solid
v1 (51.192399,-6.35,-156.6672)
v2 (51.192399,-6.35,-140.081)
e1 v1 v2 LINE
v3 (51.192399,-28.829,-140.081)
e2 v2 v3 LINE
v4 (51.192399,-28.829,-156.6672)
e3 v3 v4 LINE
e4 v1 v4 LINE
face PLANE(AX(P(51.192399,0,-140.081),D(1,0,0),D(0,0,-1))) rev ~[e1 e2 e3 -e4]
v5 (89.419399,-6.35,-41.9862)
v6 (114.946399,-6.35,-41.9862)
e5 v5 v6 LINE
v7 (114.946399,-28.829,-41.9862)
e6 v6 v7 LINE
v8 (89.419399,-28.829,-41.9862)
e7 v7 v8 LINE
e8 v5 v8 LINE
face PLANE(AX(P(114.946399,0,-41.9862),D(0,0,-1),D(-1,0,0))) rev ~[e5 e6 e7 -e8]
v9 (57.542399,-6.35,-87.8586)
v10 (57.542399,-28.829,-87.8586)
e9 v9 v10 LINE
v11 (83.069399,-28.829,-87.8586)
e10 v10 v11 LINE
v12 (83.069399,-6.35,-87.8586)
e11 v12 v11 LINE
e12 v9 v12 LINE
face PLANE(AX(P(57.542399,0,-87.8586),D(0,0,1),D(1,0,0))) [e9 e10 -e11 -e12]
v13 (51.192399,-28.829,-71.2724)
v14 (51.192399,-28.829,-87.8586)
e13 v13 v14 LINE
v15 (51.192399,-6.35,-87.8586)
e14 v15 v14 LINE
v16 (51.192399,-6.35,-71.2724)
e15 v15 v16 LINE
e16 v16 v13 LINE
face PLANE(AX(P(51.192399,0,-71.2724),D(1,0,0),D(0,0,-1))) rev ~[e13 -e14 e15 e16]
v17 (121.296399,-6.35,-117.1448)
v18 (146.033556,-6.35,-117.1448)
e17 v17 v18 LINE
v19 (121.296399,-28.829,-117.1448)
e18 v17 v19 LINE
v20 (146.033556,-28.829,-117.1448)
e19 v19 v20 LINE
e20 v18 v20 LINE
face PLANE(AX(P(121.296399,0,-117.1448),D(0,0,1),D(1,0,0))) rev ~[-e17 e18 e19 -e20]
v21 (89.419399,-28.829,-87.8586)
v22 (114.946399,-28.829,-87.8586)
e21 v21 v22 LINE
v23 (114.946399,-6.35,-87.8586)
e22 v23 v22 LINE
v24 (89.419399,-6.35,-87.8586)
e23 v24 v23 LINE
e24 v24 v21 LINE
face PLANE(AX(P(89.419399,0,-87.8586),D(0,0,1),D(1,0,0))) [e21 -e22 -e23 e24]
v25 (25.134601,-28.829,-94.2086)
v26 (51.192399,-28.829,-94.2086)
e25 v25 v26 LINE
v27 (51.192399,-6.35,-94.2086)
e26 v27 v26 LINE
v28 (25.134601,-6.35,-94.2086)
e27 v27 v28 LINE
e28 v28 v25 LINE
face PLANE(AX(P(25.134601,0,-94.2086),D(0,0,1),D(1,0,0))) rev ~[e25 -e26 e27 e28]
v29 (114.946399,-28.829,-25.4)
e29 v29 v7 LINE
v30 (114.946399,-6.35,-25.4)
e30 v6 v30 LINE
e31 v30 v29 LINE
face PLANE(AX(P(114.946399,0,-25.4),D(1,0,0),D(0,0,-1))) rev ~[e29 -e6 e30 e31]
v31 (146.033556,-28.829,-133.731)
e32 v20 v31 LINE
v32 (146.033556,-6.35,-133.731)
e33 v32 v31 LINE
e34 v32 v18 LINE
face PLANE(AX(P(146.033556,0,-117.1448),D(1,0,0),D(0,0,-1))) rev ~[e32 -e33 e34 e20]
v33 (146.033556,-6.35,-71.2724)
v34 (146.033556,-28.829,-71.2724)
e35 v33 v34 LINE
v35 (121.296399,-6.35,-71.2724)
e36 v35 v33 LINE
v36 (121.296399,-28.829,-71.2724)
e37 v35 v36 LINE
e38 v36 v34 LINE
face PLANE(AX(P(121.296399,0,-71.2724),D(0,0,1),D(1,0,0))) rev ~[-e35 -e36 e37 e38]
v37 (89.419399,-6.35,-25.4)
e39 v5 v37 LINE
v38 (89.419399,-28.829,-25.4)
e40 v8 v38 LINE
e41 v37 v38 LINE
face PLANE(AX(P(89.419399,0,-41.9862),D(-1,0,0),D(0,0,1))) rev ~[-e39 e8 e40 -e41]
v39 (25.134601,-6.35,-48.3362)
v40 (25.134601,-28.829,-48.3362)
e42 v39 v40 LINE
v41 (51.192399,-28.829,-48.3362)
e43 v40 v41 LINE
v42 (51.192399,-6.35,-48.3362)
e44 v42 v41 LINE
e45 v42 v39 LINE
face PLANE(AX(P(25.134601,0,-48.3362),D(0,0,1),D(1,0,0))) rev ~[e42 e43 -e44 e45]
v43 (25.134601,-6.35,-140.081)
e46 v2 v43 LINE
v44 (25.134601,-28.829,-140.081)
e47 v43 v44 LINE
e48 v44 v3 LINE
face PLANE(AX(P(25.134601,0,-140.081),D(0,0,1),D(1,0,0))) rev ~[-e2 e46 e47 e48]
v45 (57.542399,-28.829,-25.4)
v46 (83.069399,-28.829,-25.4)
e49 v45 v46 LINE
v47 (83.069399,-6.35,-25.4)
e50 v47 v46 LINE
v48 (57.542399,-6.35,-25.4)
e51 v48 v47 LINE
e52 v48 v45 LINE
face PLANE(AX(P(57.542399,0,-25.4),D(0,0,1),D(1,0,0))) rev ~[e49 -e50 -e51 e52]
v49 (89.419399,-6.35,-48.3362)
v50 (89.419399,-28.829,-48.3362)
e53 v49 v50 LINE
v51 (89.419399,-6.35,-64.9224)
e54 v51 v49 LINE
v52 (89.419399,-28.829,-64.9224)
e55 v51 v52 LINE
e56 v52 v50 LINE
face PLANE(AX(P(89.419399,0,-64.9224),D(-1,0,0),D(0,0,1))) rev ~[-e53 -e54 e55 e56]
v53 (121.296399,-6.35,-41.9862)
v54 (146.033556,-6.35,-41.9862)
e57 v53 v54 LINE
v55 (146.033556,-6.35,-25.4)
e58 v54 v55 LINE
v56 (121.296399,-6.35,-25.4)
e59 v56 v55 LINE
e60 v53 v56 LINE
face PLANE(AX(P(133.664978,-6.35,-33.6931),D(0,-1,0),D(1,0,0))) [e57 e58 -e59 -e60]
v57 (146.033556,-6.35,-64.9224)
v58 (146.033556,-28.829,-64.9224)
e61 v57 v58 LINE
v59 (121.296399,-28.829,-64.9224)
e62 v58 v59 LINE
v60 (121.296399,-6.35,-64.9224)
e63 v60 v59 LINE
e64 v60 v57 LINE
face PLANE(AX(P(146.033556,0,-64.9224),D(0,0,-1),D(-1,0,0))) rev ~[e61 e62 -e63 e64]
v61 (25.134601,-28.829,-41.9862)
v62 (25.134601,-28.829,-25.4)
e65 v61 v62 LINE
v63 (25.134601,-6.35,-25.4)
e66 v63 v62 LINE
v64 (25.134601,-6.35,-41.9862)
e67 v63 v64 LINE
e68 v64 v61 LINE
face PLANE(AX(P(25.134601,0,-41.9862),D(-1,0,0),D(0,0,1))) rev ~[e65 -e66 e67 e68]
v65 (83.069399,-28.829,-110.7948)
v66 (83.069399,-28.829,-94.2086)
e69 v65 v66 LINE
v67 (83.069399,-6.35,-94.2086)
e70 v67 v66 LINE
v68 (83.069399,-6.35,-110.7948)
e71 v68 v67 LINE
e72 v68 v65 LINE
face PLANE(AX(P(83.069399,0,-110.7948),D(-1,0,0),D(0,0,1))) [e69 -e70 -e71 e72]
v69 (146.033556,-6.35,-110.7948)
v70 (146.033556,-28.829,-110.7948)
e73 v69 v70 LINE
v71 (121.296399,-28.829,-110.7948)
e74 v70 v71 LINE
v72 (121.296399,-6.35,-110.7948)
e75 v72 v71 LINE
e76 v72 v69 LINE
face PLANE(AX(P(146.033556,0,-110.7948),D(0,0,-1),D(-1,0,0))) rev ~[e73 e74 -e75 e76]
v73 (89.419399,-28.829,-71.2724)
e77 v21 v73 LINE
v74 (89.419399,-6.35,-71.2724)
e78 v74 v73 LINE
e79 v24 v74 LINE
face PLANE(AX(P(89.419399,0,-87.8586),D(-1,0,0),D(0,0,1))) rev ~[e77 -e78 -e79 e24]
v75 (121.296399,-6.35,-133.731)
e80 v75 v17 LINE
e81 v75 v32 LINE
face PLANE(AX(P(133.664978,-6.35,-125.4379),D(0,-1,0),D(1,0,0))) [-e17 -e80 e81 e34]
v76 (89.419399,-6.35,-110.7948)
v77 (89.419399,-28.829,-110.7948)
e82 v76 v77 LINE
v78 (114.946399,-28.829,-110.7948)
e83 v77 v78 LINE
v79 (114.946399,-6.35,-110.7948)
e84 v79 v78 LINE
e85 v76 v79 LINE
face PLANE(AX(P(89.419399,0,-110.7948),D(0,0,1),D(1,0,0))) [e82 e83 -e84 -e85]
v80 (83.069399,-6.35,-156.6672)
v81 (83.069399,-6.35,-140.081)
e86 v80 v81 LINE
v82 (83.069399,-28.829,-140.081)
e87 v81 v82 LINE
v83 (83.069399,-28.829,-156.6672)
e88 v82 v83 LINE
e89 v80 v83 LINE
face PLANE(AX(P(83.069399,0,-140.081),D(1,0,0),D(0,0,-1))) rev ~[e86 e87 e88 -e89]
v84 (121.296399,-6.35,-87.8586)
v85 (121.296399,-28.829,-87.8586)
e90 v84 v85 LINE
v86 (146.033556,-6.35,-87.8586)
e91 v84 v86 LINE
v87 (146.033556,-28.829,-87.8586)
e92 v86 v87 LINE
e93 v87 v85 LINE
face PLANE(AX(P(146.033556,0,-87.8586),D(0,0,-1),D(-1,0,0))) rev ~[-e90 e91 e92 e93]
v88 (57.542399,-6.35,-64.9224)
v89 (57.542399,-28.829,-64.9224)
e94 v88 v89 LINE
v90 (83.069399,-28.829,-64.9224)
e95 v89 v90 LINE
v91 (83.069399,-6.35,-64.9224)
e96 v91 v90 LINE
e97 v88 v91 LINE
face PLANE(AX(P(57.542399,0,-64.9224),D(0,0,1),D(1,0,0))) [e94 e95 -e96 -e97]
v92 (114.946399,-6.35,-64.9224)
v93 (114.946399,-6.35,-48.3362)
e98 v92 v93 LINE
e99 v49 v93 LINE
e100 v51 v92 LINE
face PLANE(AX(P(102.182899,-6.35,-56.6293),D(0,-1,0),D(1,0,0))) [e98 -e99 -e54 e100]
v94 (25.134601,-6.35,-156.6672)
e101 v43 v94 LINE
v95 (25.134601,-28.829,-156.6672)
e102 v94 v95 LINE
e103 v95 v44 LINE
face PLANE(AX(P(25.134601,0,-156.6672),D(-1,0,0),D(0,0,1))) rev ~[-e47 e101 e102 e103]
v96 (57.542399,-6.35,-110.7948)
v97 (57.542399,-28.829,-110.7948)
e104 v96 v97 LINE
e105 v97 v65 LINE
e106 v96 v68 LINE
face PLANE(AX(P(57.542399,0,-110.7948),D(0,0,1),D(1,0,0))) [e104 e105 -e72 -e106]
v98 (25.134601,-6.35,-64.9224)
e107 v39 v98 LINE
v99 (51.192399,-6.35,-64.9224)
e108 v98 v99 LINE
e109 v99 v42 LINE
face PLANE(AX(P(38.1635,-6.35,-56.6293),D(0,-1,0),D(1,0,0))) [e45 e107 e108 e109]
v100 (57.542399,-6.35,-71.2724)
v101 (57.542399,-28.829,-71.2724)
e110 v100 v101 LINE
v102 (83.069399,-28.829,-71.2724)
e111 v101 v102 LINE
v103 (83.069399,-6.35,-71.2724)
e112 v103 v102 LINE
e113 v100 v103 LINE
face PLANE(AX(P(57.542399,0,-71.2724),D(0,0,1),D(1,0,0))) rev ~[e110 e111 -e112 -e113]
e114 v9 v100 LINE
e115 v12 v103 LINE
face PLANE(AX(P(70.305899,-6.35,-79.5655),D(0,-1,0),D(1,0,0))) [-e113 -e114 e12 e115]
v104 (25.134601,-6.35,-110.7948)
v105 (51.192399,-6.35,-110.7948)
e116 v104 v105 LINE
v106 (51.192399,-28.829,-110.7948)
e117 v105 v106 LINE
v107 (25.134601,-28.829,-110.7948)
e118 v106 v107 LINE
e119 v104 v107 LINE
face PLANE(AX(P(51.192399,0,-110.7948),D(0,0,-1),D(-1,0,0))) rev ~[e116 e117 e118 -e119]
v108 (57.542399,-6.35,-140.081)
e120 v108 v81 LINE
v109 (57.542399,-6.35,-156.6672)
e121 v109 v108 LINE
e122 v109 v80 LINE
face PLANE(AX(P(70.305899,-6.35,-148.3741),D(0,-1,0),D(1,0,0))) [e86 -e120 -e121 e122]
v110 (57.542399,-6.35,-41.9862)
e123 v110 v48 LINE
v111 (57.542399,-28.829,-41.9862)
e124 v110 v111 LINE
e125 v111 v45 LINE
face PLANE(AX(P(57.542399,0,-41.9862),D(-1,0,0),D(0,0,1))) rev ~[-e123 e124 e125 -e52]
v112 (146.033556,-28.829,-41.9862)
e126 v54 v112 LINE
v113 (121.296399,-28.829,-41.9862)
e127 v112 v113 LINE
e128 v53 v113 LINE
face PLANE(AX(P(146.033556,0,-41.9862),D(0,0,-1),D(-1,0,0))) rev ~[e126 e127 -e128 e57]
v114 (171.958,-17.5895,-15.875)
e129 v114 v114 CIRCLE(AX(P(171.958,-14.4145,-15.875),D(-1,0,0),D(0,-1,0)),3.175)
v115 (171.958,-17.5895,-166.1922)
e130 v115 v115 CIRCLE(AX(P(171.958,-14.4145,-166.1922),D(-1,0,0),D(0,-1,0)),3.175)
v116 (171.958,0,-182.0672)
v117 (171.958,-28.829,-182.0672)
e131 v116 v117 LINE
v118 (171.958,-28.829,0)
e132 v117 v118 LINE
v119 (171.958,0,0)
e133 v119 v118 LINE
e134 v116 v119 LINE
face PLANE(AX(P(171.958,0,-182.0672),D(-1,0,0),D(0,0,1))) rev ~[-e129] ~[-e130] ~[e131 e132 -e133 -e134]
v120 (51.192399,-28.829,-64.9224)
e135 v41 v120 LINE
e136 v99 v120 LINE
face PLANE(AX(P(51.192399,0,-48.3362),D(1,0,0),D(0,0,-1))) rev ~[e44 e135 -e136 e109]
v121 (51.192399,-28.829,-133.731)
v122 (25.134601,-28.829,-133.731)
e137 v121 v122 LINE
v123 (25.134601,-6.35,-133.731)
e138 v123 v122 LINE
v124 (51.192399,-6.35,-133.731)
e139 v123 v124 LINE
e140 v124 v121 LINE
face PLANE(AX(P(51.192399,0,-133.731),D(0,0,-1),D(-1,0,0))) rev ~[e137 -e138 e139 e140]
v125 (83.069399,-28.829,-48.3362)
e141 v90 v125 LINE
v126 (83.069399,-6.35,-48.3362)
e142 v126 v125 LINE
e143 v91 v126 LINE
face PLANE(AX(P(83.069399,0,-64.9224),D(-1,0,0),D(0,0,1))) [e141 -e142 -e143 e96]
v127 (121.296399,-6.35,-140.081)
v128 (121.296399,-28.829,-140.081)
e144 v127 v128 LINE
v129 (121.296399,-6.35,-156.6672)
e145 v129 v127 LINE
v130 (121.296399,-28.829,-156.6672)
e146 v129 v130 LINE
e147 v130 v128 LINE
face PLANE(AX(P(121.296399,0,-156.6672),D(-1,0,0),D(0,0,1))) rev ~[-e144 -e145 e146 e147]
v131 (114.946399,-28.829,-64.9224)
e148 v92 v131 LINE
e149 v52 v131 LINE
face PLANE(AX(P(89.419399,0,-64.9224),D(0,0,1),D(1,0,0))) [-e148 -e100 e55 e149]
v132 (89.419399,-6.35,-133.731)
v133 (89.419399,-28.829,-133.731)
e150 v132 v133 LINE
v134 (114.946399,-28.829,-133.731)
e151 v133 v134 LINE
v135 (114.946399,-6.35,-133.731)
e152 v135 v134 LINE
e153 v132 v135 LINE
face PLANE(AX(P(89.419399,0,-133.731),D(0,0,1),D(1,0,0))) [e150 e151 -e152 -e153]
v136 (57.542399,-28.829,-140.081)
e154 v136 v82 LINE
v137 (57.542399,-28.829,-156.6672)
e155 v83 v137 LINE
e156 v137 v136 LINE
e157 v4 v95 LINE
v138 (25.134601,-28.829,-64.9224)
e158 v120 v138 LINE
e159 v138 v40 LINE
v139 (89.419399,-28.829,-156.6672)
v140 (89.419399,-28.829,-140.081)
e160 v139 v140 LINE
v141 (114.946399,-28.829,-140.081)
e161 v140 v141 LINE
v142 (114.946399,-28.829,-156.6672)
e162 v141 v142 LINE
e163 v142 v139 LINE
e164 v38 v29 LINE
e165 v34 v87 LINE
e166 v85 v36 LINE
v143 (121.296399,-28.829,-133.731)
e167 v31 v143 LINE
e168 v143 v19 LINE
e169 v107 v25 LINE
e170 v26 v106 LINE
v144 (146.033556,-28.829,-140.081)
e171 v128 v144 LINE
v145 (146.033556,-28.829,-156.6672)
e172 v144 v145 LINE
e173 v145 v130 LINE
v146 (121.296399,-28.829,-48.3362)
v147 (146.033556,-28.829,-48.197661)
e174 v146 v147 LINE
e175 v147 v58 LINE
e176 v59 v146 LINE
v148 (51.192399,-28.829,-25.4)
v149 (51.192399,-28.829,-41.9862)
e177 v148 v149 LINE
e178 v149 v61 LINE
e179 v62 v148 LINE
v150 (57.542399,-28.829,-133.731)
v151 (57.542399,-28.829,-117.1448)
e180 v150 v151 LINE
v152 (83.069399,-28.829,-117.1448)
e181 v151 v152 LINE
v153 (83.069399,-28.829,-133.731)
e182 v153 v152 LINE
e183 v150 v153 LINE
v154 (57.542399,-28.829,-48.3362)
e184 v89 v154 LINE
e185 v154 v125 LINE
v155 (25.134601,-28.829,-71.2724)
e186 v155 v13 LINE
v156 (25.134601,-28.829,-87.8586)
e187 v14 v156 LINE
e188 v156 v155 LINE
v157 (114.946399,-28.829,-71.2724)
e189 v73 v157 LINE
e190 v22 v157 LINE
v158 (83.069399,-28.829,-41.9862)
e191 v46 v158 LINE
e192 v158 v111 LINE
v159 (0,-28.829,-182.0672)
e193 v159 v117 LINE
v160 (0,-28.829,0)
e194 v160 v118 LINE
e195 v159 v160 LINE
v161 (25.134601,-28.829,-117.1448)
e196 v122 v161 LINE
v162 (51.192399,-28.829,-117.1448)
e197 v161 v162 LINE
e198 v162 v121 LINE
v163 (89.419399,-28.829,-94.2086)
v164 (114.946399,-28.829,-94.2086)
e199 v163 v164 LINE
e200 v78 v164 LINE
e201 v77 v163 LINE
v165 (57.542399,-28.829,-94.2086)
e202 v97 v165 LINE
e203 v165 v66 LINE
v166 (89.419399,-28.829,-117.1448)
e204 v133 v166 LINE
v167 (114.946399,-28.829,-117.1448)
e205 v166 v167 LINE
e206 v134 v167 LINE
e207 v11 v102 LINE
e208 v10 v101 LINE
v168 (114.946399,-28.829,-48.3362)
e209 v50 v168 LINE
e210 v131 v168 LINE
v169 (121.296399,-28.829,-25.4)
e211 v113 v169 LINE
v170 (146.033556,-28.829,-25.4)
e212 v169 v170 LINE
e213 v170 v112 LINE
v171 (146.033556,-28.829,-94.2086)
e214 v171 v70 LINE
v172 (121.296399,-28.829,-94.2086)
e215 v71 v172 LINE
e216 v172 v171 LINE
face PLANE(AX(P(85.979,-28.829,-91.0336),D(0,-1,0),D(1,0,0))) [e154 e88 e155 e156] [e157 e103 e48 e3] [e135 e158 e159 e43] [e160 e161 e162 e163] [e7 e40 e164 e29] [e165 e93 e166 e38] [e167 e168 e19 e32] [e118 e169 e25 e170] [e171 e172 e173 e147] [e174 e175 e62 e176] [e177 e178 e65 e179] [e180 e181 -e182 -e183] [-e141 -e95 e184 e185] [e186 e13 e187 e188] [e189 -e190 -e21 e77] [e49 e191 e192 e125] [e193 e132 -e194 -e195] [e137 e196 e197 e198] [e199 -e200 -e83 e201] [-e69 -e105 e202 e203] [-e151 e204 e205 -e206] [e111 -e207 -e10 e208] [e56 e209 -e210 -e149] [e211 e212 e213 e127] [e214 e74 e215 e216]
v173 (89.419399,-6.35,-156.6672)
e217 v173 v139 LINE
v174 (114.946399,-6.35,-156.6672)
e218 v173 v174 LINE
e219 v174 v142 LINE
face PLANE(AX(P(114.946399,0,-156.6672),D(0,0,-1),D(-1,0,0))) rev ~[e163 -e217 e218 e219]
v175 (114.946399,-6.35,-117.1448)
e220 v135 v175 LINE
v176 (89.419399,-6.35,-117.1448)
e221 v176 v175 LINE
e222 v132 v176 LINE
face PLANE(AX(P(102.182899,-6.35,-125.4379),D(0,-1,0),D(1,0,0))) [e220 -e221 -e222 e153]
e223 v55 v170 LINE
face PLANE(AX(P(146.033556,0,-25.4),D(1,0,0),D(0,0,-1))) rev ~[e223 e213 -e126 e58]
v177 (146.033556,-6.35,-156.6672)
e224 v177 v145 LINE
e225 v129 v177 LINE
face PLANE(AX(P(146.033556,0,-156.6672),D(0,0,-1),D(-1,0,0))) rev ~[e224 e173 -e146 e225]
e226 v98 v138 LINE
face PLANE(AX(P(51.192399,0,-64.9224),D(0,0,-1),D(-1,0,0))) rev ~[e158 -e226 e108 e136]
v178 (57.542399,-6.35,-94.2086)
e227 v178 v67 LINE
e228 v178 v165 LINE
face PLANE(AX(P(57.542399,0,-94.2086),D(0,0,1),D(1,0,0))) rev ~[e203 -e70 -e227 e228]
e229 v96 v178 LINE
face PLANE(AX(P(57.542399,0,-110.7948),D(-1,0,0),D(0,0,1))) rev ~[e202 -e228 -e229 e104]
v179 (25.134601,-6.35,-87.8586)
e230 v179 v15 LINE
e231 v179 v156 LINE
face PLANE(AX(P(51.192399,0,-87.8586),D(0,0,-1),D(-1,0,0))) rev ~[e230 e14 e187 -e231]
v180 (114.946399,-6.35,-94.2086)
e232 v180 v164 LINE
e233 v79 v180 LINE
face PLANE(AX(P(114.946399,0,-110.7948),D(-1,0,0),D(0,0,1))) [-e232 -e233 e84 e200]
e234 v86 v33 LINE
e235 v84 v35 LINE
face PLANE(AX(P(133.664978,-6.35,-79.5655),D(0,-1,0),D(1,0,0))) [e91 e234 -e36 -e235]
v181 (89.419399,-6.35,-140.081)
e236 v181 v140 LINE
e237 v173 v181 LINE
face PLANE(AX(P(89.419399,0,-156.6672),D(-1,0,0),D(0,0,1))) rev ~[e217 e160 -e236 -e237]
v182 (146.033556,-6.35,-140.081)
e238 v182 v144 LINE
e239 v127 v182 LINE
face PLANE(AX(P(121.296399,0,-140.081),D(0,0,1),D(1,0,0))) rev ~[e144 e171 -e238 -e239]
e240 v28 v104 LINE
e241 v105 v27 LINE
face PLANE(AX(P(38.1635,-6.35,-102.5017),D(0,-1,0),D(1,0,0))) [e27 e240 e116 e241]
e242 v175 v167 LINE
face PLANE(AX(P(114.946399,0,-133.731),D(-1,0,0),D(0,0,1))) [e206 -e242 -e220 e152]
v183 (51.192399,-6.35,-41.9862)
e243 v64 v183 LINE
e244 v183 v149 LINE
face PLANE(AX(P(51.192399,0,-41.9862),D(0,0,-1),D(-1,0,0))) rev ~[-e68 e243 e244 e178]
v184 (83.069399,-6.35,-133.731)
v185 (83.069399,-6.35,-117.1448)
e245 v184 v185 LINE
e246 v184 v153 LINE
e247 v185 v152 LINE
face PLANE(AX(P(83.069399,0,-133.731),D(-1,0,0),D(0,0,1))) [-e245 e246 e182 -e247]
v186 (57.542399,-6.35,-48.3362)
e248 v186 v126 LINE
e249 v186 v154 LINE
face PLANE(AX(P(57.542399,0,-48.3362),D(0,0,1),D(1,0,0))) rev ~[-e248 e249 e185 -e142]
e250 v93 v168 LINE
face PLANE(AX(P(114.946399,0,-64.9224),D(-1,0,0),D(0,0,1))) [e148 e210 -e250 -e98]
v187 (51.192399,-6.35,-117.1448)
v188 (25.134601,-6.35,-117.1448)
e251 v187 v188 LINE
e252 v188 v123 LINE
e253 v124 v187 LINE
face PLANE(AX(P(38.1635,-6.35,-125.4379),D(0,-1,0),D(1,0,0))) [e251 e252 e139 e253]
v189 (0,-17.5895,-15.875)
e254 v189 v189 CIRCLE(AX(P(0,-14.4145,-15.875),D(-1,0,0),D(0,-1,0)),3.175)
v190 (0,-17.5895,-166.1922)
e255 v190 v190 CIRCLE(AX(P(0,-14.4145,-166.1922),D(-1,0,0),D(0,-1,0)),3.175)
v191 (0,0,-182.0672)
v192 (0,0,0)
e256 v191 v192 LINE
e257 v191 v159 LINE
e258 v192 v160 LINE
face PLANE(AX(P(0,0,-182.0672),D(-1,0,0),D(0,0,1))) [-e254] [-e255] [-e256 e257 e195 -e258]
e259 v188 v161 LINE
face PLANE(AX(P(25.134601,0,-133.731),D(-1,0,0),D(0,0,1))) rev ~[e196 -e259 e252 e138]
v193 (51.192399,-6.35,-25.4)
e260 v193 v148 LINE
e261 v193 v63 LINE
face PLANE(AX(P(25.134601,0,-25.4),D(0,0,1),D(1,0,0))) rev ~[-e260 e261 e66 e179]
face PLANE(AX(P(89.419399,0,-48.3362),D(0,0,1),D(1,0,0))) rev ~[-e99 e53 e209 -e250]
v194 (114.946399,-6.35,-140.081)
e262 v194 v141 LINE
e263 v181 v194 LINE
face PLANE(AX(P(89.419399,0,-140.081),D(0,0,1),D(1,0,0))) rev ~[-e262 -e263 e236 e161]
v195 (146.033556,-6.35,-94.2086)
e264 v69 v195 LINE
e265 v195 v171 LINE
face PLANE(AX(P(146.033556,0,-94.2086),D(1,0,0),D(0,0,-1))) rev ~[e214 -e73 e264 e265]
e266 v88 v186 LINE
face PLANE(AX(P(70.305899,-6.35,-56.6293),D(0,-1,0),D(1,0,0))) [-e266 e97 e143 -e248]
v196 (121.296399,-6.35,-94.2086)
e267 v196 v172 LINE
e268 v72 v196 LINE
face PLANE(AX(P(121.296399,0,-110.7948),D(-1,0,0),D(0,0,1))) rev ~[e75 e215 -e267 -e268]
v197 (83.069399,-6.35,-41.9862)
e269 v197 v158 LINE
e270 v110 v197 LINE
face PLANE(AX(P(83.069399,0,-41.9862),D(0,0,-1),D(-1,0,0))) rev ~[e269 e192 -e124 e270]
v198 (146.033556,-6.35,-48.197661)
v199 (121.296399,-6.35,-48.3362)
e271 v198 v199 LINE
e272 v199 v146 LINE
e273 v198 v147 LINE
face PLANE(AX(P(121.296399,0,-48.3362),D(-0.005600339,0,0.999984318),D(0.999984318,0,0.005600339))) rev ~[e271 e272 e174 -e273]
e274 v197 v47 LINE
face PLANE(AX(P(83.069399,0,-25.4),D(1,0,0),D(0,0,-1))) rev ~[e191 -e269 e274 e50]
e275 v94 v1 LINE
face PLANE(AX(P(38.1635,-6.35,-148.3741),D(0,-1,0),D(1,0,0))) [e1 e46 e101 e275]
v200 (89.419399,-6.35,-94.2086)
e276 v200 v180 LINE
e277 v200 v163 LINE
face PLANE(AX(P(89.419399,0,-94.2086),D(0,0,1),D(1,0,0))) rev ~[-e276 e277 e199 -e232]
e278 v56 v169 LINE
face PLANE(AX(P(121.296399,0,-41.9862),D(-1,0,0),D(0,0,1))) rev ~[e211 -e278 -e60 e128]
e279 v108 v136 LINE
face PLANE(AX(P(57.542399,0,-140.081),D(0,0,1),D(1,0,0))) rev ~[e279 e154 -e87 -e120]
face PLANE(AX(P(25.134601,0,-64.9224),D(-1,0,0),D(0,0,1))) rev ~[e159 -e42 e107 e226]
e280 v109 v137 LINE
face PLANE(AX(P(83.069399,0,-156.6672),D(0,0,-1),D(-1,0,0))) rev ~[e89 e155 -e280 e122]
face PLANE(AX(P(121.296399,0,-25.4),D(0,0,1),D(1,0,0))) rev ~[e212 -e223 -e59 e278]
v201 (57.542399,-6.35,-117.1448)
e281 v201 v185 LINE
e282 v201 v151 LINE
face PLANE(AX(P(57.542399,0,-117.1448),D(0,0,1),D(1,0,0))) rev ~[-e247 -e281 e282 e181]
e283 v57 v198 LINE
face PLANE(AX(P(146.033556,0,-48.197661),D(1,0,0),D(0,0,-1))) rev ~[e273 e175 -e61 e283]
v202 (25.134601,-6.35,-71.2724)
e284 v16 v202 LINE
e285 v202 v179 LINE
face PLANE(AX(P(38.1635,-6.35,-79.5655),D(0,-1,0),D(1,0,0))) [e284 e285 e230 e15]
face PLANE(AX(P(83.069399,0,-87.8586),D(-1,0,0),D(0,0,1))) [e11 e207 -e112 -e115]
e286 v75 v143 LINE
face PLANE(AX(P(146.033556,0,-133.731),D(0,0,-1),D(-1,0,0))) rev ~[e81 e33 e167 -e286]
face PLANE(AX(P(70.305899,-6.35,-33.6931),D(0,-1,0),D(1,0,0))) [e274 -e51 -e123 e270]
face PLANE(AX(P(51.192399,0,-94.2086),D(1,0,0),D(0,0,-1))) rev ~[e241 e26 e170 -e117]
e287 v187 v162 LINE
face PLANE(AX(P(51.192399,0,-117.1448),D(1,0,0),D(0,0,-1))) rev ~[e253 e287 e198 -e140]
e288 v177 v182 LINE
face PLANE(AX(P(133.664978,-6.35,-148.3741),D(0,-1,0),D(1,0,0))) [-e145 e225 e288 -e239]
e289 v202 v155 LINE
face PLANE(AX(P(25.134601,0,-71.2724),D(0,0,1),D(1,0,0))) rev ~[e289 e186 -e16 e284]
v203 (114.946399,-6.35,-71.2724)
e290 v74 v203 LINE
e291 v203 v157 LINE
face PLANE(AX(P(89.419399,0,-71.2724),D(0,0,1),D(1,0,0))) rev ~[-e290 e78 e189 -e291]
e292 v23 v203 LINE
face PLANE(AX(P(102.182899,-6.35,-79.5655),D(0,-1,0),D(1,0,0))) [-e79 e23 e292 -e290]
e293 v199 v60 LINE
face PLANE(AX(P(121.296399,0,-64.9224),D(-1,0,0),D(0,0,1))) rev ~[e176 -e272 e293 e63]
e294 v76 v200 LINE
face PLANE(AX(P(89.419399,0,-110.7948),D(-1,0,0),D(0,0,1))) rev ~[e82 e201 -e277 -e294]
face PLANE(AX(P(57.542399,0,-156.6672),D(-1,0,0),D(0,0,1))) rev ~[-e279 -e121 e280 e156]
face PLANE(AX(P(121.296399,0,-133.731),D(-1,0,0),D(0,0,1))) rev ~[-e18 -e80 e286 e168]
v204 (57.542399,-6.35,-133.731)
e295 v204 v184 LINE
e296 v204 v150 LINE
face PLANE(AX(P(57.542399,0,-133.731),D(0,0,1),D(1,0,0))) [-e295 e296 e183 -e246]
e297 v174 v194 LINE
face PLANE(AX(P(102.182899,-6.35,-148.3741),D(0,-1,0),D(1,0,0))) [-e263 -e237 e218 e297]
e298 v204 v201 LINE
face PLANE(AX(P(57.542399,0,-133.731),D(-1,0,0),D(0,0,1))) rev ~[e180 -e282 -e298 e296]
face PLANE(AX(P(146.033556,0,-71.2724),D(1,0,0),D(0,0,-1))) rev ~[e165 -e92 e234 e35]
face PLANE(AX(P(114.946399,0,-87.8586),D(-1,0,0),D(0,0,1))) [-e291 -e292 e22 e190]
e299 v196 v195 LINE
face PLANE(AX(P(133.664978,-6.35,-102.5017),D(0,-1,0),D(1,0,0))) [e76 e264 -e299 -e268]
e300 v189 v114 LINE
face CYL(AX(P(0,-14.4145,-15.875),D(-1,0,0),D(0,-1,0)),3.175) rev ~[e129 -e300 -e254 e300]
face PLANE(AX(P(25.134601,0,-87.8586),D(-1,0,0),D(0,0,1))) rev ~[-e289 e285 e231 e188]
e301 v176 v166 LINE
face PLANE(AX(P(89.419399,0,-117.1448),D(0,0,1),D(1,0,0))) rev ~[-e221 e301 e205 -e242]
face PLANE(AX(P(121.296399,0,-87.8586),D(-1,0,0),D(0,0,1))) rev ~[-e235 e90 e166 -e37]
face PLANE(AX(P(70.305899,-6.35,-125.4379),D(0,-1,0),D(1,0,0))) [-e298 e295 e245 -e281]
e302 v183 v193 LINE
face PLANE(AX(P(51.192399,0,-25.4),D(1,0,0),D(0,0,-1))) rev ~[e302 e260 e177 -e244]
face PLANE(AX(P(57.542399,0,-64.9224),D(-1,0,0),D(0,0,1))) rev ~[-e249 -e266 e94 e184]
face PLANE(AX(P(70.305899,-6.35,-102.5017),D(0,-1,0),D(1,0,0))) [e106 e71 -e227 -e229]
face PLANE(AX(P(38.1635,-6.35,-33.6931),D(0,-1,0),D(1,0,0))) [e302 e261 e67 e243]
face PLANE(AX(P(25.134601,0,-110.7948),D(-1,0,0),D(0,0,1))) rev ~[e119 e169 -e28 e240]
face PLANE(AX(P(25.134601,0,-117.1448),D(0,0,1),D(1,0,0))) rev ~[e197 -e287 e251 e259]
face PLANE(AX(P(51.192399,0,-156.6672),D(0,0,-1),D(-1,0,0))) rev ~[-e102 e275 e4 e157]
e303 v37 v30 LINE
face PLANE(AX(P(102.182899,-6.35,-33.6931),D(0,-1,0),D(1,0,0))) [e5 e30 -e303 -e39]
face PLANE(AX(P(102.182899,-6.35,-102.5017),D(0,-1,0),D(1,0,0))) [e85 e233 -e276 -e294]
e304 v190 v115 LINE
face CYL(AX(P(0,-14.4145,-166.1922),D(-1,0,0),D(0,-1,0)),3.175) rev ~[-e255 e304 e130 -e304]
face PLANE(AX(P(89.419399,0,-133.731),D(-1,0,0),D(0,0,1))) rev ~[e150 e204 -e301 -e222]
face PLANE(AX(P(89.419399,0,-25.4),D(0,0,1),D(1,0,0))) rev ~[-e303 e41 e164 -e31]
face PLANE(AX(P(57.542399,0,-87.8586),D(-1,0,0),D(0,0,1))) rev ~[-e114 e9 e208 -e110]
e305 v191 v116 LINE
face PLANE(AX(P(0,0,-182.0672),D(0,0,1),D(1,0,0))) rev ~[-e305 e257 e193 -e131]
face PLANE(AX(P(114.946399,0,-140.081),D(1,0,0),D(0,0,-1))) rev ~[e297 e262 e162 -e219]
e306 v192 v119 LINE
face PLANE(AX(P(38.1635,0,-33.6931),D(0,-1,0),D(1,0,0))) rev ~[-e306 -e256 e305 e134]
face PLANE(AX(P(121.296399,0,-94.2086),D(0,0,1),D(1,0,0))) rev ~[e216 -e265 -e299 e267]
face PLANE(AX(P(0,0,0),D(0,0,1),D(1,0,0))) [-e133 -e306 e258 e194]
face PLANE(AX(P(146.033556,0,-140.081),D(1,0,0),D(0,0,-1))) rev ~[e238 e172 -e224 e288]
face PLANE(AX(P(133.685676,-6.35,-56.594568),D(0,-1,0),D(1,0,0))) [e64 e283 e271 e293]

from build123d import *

# Parameters (mm, degrees)
F0_W     = 171.958
F0_H     = 182.0672
F0_W_2   = 25.527
F0_H_2   = 16.5862
F1_DEPTH = 28.829
F0_W_3   = 24.7371567947
F2_DEPTH = 6.35
F3_R     = 3.175
F4_DEPTH = 203.2


# Not quite as in the source:
# - a length typed as a fraction of an inch, garbled in the dataset ("3 / 203.2 mm" for 3/8 in), is restored


with BuildPart() as f1:
    # F0 (on Front) → F1 (new body)
    with BuildSketch(Plane.XZ):
        with Locations((85.979, -91.0336)):
            Rectangle(F0_W, F0_H)
        Polygon((25.1346008565, -41.4550490677), (25.1346008565, -25.4), (51.1923991435, -25.4), (57.5423991435, -25.4), (83.0693991435, -25.4), (85.5840783974, -25.4), (89.4193991435, -25.4), (114.9463991435, -25.4), (121.2963991435, -25.4), (146.0335559382, -25.4), (146.0335559382, -41.9862), (146.0335559382, -48.1976613704), (146.0335559382, -64.9224), (146.0335559382, -71.2724), (146.0335559382, -87.8586), (146.0335559382, -94.2086), (146.0335559382, -110.7948), (146.0335559382, -117.1448), (146.0335559382, -133.731), (146.0335559382, -140.081), (146.0335559382, -156.6672), (121.2963991435, -156.6672), (114.9463991435, -156.6672), (89.4193991435, -156.6672), (83.0693991435, -156.6672), (57.5423991435, -156.6672), (51.1923991435, -156.6672), (25.1346008565, -156.6672), (25.1346008565, -140.081), (25.1346008565, -133.731), (25.1346008565, -117.1448), (25.1346008565, -110.7948), (25.1346008565, -94.2086), (25.1346008565, -87.8586), (25.1346008565, -71.2724), (25.1346008565, -64.9224), (25.1346008565, -48.3362), (25.1346008565, -41.9862), align=None, mode=Mode.SUBTRACT)
        Polygon((57.5423991435, -25.4), (51.1923991435, -25.4), (51.1923991435, -41.9862), (25.1346008565, -41.9862), (25.1346008565, -48.3362), (38.1635, -48.3362), (51.1923991435, -48.3362), (51.1923991435, -64.9224), (38.1635, -64.9224), (25.1346008565, -64.9224), (25.1346008565, -71.2724), (38.1635, -71.2724), (51.1923991435, -71.2724), (51.1923991435, -87.8586), (38.1635, -87.8586), (25.1346008565, -87.8586), (25.1346008565, -94.2086), (38.1635, -94.2086), (51.1923991435, -94.2086), (51.1923991435, -110.7948), (25.1346008565, -110.7948), (25.1346008565, -117.1448), (38.1635, -117.1448), (51.1923991435, -117.1448), (51.1923991435, -133.731), (38.1635, -133.731), (25.1346008565, -133.731), (25.1346008565, -140.081), (38.1635, -140.081), (51.1923991435, -140.081), (51.1923991435, -156.6672), (57.5423991435, -156.6672), (57.5423991435, -140.081), (83.0693991435, -140.081), (83.0693991435, -156.6672), (89.4193991435, -156.6672), (89.4193991435, -140.081), (114.9463991435, -140.081), (114.9463991435, -156.6672), (121.2963991435, -156.6672), (121.2963991435, -140.081), (146.0335559382, -140.081), (146.0335559382, -133.731), (121.2963991435, -133.731), (121.2963991435, -117.1448), (146.0335559382, -117.1448), (146.0335559382, -110.7948), (121.2963991435, -110.7948), (121.2963991435, -94.2086), (146.0335559382, -94.2086), (146.0335559382, -87.8586), (121.2963991435, -87.8586), (121.2963991435, -71.2724), (146.0335559382, -71.2724), (146.0335559382, -64.9224), (121.2963991435, -64.9224), (121.2963991435, -48.3362), (146.0335559382, -48.1976613704), (146.0335559382, -41.9862), (121.2963991435, -41.9862), (121.2963991435, -25.4), (114.9463991435, -25.4), (114.9463991435, -41.9862), (89.4193991435, -41.9862), (89.4193991435, -25.4), (85.5840783974, -25.4), (83.0693991435, -25.4), (83.0693991435, -41.9862), (57.5423991435, -41.9862), align=None)
        with Locations((70.3058991435, -125.4379)):
            Rectangle(F0_W_2, F0_H_2, mode=Mode.SUBTRACT)
        with Locations((70.3058991435, -102.5017)):
            Rectangle(F0_W_2, F0_H_2, mode=Mode.SUBTRACT)
        with Locations((102.1828991435, -125.4379)):
            Rectangle(F0_W_2, F0_H_2, mode=Mode.SUBTRACT)
        with Locations((102.1828991435, -102.5017)):
            Rectangle(F0_W_2, F0_H_2, mode=Mode.SUBTRACT)
        with Locations((70.3058991435, -79.5655)):
            Rectangle(F0_W_2, F0_H_2, mode=Mode.SUBTRACT)
        with Locations((70.3058991435, -56.6293)):
            Rectangle(F0_W_2, F0_H_2, mode=Mode.SUBTRACT)
        with Locations((102.1828991435, -79.5655)):
            Rectangle(F0_W_2, F0_H_2, mode=Mode.SUBTRACT)
        with Locations((102.1828991435, -56.6293)):
            Rectangle(F0_W_2, F0_H_2, mode=Mode.SUBTRACT)
    extrude(amount=F1_DEPTH)

    # F0 (on Front) → F2 (join)
    with BuildSketch(Plane.XZ):
        Polygon((51.1923991435, -25.4), (25.1346008565, -25.4), (25.1346008565, -41.4550490677), (25.1346008565, -41.9862), (51.1923991435, -41.9862), align=None)
        with Locations((70.3058991435, -33.6931)):
            Rectangle(F0_W_2, F0_H_2)
        with Locations((102.1828991435, -33.6931)):
            Rectangle(F0_W_2, F0_H_2)
        with Locations((133.6649775409, -33.6931)):
            Rectangle(F0_W_3, F0_H_2)
        Polygon((146.0335559382, -64.9224), (146.0335559382, -48.1976613704), (121.2963991435, -48.3362), (121.2963991435, -64.9224), align=None)
        with Locations((102.1828991435, -56.6293)):
            Rectangle(F0_W_2, F0_H_2)
        with Locations((70.3058991435, -56.6293)):
            Rectangle(F0_W_2, F0_H_2)
        Polygon((38.1635, -48.3362), (25.1346008565, -48.3362), (25.1346008565, -64.9224), (38.1635, -64.9224), (51.1923991435, -64.9224), (51.1923991435, -48.3362), align=None)
        Polygon((38.1635, -71.2724), (25.1346008565, -71.2724), (25.1346008565, -87.8586), (38.1635, -87.8586), (51.1923991435, -87.8586), (51.1923991435, -71.2724), align=None)
        with Locations((70.3058991435, -79.5655)):
            Rectangle(F0_W_2, F0_H_2)
        with Locations((102.1828991435, -79.5655)):
            Rectangle(F0_W_2, F0_H_2)
        with Locations((133.6649775409, -79.5655)):
            Rectangle(F0_W_3, F0_H_2)
        with Locations((133.6649775409, -102.5017)):
            Rectangle(F0_W_3, F0_H_2)
        with Locations((102.1828991435, -102.5017)):
            Rectangle(F0_W_2, F0_H_2)
        with Locations((70.3058991435, -102.5017)):
            Rectangle(F0_W_2, F0_H_2)
        Polygon((38.1635, -94.2086), (25.1346008565, -94.2086), (25.1346008565, -110.7948), (51.1923991435, -110.7948), (51.1923991435, -94.2086), align=None)
        Polygon((38.1635, -117.1448), (25.1346008565, -117.1448), (25.1346008565, -133.731), (38.1635, -133.731), (51.1923991435, -133.731), (51.1923991435, -117.1448), align=None)
        with Locations((133.6649775409, -125.4379)):
            Rectangle(F0_W_3, F0_H_2)
        with Locations((133.6649775409, -148.3741)):
            Rectangle(F0_W_3, F0_H_2)
        with Locations((102.1828991435, -148.3741)):
            Rectangle(F0_W_2, F0_H_2)
        with Locations((70.3058991435, -148.3741)):
            Rectangle(F0_W_2, F0_H_2)
        Polygon((38.1635, -140.081), (25.1346008565, -140.081), (25.1346008565, -156.6672), (51.1923991435, -156.6672), (51.1923991435, -140.081), align=None)
        with Locations((102.1828991435, -125.4379)):
            Rectangle(F0_W_2, F0_H_2)
        with Locations((70.3058991435, -125.4379)):
            Rectangle(F0_W_2, F0_H_2)
    extrude(amount=F2_DEPTH)

    # F3 (on face) → F4 (cut)
    with BuildSketch(Plane(origin=(0, 0, 0), x_dir=(0, -1, 0), z_dir=(-1, 0, 0))):
        with Locations((14.4145, -15.875)):
            Circle(F3_R)
        with Locations((14.4145, -166.1922)):
            Circle(F3_R)
    extrude(amount=-F4_DEPTH, mode=Mode.SUBTRACT)


solid = f1.part
